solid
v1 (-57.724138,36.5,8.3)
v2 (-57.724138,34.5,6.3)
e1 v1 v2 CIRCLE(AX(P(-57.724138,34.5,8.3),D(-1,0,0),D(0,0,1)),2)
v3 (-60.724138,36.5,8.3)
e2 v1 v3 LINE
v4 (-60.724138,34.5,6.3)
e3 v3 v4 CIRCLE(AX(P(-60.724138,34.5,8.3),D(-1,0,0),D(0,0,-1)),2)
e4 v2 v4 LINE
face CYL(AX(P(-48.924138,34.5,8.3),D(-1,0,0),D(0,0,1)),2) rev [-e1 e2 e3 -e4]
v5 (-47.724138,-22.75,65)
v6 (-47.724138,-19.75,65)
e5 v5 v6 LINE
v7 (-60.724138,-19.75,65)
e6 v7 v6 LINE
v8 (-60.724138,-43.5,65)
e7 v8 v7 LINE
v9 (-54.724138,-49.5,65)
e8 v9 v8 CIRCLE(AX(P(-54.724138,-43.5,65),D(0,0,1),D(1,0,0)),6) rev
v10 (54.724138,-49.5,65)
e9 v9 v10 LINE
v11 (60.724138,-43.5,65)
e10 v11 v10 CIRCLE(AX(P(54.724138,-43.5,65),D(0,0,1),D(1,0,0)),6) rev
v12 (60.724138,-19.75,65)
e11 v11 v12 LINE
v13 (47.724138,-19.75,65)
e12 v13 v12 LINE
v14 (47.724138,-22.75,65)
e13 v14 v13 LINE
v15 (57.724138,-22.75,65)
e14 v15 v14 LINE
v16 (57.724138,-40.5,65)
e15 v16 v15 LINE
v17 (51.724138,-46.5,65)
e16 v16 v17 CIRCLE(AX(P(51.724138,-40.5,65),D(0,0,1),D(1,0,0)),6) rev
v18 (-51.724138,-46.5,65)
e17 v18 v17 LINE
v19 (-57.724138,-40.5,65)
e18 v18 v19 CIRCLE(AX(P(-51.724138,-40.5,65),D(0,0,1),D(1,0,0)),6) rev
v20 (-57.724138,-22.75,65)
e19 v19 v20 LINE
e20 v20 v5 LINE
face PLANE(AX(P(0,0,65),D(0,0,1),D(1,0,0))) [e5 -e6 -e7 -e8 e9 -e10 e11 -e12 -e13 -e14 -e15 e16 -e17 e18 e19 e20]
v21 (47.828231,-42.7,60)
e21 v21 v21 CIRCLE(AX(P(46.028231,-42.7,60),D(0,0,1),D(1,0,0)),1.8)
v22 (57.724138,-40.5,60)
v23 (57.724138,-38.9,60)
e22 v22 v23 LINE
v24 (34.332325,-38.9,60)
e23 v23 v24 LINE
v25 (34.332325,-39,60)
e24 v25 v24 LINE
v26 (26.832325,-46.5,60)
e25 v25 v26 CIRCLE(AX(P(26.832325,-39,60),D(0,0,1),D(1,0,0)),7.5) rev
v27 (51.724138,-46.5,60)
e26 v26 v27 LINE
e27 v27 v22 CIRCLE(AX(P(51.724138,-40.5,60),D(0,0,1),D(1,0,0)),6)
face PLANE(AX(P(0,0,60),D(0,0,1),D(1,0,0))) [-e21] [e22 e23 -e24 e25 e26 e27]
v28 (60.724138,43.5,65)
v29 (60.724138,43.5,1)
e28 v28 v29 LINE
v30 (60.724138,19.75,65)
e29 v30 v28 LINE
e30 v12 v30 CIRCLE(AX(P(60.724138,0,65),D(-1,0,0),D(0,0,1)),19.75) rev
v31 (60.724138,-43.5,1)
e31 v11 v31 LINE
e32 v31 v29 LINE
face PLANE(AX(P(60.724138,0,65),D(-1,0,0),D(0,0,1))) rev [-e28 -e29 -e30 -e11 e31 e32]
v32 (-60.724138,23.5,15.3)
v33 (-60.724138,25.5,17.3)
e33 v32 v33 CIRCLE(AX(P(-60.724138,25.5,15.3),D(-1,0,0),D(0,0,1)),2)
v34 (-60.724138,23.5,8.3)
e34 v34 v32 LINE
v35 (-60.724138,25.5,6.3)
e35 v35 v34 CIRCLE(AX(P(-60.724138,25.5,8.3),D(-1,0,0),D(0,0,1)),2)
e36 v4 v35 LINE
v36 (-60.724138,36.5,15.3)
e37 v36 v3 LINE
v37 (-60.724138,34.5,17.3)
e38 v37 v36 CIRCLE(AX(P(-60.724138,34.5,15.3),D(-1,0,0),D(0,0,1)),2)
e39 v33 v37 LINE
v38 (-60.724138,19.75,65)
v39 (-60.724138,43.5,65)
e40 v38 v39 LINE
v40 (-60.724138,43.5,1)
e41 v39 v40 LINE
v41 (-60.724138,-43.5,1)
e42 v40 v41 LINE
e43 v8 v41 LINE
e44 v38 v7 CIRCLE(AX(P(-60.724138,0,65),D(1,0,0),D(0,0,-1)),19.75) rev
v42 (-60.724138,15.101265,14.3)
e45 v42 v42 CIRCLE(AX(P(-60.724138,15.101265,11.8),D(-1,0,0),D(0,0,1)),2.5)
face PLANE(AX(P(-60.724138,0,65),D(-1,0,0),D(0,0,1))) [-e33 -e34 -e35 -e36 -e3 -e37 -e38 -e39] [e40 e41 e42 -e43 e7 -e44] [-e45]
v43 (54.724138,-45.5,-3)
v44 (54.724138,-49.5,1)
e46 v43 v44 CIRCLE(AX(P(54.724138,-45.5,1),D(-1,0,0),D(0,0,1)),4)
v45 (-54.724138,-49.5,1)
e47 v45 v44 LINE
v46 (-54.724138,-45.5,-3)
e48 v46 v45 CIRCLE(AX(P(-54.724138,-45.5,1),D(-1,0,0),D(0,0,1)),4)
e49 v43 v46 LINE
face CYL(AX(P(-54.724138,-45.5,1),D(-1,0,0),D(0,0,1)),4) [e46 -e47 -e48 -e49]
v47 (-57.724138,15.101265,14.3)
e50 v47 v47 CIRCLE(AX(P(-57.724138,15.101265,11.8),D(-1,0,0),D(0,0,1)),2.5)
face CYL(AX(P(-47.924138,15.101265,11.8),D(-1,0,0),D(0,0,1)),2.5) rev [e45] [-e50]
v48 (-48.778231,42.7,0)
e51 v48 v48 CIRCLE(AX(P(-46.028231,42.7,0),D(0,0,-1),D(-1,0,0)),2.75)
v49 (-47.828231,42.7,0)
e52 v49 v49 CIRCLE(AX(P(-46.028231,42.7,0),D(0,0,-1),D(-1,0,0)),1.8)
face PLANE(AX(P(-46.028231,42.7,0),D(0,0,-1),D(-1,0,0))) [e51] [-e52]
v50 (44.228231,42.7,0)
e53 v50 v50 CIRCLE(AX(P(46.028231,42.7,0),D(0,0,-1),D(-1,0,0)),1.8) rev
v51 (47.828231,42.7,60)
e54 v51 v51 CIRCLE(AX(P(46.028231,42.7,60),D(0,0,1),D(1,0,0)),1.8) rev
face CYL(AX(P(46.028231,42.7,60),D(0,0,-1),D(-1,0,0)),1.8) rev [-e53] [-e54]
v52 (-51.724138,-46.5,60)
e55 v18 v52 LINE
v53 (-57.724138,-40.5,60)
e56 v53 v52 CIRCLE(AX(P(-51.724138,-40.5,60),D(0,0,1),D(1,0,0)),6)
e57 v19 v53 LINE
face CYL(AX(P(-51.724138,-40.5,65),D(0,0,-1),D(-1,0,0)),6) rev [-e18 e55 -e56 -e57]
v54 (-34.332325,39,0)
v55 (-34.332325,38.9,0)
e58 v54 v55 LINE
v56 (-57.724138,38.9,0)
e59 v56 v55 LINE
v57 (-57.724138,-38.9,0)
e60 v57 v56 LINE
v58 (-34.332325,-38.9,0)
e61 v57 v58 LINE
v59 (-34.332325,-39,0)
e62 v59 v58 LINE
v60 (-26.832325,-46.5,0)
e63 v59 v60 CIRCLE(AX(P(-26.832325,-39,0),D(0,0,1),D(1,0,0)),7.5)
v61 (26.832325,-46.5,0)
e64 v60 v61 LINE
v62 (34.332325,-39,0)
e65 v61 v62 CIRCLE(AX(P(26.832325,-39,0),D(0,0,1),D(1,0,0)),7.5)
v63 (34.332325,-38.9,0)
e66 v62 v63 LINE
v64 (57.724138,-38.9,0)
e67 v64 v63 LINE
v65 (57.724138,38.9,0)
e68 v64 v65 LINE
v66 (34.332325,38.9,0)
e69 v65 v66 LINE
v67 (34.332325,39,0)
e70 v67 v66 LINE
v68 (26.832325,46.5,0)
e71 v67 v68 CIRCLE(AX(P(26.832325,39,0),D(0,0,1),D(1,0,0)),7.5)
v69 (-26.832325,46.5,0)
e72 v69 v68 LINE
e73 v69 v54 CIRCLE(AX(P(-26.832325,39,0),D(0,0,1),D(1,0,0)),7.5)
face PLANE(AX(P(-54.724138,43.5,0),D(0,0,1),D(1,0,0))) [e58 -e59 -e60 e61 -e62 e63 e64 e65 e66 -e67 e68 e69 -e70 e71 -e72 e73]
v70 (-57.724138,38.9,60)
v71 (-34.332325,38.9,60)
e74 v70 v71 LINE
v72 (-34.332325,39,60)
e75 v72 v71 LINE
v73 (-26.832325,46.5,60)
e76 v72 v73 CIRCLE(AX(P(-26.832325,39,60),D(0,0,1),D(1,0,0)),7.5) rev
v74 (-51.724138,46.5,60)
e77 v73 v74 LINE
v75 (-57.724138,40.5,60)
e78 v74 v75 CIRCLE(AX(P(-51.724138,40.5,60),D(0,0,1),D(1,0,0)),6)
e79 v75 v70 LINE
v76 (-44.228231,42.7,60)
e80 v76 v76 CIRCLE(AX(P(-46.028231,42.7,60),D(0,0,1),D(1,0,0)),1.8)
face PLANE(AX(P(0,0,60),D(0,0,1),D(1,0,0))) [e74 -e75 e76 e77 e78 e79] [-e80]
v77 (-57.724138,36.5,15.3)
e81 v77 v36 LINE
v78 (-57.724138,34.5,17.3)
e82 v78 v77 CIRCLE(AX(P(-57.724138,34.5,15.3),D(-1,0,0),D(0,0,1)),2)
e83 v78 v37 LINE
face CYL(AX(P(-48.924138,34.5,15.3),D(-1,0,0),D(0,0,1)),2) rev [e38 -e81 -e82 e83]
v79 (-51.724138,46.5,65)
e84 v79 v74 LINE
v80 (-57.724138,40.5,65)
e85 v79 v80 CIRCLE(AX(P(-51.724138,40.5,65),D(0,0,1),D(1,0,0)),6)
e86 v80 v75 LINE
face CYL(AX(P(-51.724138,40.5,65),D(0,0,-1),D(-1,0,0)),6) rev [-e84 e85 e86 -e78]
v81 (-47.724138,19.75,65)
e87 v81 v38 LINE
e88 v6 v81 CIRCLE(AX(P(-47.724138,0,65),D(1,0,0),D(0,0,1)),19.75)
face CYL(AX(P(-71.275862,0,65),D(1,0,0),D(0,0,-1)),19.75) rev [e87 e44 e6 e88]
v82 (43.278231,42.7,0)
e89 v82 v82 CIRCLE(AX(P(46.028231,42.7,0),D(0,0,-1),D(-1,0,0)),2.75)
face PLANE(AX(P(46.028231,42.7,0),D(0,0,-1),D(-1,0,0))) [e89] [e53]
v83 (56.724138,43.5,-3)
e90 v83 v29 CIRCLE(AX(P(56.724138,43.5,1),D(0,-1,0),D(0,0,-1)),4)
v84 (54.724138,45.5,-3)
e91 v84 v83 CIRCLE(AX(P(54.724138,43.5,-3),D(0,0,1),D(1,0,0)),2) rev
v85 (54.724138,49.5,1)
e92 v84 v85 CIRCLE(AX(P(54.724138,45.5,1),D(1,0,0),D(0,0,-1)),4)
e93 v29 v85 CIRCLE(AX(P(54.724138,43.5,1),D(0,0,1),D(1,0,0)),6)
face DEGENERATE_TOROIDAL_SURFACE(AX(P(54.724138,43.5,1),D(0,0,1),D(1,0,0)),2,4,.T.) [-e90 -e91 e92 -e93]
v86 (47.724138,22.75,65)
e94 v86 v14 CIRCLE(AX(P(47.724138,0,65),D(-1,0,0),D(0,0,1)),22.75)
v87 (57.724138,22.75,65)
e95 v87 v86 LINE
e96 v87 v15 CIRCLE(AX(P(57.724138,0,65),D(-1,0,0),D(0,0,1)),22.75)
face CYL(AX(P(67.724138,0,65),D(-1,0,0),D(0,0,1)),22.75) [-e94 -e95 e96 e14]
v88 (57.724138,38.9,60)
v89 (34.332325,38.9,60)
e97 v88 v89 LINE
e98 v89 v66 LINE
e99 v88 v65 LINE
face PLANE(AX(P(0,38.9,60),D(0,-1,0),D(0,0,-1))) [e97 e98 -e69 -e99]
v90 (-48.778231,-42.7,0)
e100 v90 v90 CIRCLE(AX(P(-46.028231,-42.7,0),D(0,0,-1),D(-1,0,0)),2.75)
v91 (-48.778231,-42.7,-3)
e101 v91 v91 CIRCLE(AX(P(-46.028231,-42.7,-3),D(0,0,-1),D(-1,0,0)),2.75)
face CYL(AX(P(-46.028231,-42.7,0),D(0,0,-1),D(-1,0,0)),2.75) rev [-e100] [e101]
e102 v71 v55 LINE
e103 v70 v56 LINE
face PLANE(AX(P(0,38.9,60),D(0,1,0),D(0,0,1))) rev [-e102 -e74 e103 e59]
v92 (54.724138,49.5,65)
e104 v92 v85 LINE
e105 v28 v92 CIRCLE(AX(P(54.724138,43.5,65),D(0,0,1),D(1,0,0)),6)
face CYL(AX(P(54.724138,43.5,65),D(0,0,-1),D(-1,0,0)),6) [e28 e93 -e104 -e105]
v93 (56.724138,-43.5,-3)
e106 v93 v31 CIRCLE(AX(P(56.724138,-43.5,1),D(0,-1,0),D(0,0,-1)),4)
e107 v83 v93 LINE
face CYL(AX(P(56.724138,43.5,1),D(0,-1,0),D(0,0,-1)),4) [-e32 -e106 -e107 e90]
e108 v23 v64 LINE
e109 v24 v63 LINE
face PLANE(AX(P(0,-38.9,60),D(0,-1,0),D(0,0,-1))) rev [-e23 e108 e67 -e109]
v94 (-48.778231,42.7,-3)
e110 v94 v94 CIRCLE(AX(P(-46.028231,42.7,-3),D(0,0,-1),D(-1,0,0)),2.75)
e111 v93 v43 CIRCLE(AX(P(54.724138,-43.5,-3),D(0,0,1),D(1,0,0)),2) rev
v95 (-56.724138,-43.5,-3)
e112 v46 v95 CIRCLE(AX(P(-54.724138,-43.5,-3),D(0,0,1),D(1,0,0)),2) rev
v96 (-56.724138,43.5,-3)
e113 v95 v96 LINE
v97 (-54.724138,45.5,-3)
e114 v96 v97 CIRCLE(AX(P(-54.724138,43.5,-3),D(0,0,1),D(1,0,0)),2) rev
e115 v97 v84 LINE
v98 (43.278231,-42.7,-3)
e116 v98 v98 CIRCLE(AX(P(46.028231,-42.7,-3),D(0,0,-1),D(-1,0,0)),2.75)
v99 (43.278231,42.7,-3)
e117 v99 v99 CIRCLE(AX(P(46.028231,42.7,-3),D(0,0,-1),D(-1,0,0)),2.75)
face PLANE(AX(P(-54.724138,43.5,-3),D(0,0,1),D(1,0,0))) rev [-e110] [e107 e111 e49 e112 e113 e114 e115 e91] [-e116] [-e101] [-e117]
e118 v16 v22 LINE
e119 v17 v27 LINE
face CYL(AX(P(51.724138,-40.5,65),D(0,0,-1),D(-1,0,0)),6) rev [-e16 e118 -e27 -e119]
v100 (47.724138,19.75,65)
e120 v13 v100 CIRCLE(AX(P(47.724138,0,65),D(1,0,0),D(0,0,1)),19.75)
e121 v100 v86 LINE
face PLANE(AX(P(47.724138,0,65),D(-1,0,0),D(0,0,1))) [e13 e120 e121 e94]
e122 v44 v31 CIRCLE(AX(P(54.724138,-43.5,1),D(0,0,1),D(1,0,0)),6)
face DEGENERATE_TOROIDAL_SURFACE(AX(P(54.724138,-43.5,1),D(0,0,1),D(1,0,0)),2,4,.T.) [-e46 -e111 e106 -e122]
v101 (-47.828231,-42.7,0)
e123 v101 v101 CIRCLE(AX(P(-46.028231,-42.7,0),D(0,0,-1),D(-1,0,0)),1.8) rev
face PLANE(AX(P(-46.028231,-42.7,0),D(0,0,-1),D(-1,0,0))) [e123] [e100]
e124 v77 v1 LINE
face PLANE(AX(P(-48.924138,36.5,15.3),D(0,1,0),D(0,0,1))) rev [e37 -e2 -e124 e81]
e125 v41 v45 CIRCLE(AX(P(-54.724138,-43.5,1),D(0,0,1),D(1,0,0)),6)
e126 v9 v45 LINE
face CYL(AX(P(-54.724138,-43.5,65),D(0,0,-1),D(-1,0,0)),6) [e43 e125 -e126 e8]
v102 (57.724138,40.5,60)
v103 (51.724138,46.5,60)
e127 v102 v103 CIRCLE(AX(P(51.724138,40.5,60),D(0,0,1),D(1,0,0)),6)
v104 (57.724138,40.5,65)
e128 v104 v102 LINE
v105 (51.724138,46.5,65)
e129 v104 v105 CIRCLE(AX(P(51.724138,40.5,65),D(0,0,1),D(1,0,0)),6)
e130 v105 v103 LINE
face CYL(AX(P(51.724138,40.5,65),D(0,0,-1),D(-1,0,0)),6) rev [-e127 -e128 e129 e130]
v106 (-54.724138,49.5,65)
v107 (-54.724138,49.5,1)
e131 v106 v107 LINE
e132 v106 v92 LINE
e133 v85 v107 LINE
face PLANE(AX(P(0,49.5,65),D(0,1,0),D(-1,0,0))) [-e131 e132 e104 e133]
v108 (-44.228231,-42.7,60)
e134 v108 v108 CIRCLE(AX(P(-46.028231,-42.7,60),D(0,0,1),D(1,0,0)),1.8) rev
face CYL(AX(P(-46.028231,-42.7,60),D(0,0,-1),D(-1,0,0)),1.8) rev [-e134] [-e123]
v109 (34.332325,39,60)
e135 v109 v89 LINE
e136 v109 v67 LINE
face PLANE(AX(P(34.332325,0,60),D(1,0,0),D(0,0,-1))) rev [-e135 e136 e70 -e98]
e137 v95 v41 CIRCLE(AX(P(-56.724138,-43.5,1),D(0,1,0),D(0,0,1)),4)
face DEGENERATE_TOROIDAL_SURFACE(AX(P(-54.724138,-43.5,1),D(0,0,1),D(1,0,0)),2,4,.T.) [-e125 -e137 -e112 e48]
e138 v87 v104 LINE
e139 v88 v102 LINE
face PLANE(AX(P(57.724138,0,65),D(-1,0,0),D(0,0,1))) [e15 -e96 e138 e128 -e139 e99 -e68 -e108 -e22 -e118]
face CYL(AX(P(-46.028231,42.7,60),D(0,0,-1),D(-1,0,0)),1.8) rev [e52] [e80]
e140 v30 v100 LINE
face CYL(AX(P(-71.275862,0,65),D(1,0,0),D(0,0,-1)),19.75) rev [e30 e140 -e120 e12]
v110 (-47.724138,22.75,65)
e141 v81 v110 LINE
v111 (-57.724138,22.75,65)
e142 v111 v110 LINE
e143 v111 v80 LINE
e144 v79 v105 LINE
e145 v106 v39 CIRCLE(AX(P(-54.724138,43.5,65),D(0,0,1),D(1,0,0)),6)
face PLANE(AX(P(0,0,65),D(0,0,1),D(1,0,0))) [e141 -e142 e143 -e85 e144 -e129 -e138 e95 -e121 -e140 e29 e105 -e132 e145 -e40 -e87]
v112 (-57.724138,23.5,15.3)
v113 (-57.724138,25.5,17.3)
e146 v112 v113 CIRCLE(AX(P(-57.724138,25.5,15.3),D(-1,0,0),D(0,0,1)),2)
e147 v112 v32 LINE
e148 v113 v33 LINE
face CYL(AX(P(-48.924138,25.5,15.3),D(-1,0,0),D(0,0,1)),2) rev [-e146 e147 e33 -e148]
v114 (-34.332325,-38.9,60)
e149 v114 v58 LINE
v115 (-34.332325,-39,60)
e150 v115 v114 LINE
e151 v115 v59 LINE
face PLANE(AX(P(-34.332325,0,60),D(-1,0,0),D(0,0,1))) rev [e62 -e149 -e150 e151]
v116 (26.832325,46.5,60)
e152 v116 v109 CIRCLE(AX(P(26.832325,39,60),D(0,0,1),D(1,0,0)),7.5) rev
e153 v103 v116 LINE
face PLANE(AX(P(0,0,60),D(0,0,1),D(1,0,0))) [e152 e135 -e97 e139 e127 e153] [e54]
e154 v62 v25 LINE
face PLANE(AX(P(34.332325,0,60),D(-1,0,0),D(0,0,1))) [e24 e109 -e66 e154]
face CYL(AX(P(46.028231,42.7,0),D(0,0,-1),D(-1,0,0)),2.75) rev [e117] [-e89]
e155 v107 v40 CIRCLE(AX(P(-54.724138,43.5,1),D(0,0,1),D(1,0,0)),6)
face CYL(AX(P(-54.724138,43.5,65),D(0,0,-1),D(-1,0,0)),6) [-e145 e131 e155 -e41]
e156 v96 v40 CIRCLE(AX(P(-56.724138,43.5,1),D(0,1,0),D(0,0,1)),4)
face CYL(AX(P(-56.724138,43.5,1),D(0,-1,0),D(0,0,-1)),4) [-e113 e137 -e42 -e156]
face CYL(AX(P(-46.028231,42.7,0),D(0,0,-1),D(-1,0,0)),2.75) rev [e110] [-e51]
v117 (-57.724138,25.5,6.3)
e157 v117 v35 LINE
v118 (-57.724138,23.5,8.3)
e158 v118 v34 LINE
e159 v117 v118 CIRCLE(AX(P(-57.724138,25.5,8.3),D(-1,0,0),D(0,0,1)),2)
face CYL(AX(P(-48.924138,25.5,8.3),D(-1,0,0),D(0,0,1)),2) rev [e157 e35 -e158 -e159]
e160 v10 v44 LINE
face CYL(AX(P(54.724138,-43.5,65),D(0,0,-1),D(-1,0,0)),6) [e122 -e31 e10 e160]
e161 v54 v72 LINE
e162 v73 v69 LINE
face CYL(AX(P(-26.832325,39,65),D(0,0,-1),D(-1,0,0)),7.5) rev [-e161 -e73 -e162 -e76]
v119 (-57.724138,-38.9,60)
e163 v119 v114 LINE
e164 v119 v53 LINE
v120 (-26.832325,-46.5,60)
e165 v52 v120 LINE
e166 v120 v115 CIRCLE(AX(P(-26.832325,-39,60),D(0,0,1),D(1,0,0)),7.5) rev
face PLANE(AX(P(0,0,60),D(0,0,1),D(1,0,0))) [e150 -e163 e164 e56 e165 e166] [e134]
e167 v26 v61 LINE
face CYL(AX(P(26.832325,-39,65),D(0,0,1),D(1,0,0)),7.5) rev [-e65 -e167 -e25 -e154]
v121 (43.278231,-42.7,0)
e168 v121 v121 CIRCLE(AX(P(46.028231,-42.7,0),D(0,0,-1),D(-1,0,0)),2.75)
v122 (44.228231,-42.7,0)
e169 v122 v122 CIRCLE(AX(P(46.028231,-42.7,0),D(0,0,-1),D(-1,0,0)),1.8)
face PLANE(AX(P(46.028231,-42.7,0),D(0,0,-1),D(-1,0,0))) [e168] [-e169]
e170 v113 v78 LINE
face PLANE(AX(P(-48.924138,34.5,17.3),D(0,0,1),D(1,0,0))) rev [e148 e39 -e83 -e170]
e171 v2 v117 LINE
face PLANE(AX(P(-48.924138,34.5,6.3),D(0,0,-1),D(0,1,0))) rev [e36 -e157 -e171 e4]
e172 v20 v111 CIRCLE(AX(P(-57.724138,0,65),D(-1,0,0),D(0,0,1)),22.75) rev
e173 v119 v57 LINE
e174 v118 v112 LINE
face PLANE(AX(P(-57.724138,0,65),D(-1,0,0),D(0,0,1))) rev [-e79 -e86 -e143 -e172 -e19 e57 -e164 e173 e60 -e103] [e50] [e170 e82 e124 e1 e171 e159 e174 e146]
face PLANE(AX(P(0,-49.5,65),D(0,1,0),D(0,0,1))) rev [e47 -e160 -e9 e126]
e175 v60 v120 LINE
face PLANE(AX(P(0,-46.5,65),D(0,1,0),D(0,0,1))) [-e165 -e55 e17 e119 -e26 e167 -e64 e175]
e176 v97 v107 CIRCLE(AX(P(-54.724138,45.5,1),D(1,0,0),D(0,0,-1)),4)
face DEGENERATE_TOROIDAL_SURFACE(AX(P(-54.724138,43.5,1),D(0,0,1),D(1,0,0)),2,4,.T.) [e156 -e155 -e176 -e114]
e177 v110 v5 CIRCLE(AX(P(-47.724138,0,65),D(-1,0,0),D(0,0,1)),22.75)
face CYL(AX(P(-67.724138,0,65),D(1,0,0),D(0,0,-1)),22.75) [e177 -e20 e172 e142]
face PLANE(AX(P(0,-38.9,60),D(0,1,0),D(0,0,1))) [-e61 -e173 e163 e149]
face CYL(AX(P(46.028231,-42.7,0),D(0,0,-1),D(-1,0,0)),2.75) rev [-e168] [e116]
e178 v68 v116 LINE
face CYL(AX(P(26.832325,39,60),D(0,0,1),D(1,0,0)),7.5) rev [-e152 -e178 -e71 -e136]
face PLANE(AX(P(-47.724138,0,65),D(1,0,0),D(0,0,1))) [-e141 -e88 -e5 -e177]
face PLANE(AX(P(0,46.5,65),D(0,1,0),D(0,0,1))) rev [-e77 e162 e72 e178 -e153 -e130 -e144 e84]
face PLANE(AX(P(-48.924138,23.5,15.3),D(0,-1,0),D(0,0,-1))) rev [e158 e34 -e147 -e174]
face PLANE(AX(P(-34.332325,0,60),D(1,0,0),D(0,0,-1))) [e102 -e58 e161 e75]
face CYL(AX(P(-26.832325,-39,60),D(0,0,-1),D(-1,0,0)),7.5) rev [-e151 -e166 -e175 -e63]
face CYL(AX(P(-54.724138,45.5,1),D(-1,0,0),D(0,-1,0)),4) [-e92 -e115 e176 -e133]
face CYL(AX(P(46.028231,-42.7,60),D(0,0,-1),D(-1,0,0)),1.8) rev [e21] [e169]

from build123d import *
from build123d.topology import SkipClean

# Parameters (mm, degrees)
BOSS_EXTRUDE1_DEPTH = 65
BOSS_EXTRUDE3_START = 3
BOSS_EXTRUDE3_DEPTH = 3
SKETCH4_R           = 19.75
CUT_EXTRUDE1_DEPTH  = 132
SKETCH8_R           = 1.8
BOSS_EXTRUDE6_DEPTH = 60
FILLET1_R           = 7.5
FILLET2_R           = 7.5
FILLET3_R           = 7.5
FILLET4_R           = 7.5
BOSS_EXTRUDE8_DEPTH = 10
FILLET8_R           = 4
CUT_EXTRUDE2_START  = -40
SKETCH13_R          = 1.8
CUT_EXTRUDE2_DEPTH  = 40
SKETCH14_R          = 2.75
CUT_EXTRUDE3_DEPTH  = 3
CUT_EXTRUDE4_DEPTH  = 11.8
SKETCH16_R          = 2.5
CUT_EXTRUDE5_DEPTH  = 12.8
SKETCH18_W          = 9.402156545
SKETCH18_H          = 47.685659657
SKETCH18_W_2        = 10.670772927
CUT_EXTRUDE6_DEPTH  = 23.8


with BuildPart() as part:
    # Sketch1 → Boss-Extrude1 (new body)
    with BuildSketch(Plane(origin=(0, 0, 0), x_dir=(0, 1, 0), z_dir=(0, 0, 1))):
        with BuildLine():
            ThreePointArc((-43.5, 60.724137931), (-47.742640687, 58.966778618), (-49.5, 54.724137931))
            Line((-49.5, 54.724137931), (-49.5, -54.724137931))
            ThreePointArc((-49.5, -54.724137931), (-47.742640687, -58.966778618), (-43.5, -60.724137931))
            Line((-43.5, -60.724137931), (43.5, -60.724137931))
            ThreePointArc((43.5, -60.724137931), (47.742640687, -58.966778618), (49.5, -54.724137931))
            Line((49.5, -54.724137931), (49.5, 54.724137931))
            ThreePointArc((49.5, 54.724137931), (47.742640687, 58.966778618), (43.5, 60.724137931))
            Line((43.5, 60.724137931), (-43.5, 60.724137931))
        make_face()
        with BuildLine():
            ThreePointArc((-46.5, 51.724137931), (-44.742640687, 55.966778618), (-40.5, 57.724137931))
            Line((-40.5, 57.724137931), (40.5, 57.724137931))
            ThreePointArc((40.5, 57.724137931), (44.742640687, 55.966778618), (46.5, 51.724137931))
            Line((46.5, 51.724137931), (46.5, -51.724137931))
            ThreePointArc((46.5, -51.724137931), (44.742640687, -55.966778618), (40.5, -57.724137931))
            Line((40.5, -57.724137931), (-40.5, -57.724137931))
            ThreePointArc((-40.5, -57.724137931), (-44.742640687, -55.966778618), (-46.5, -51.724137931))
            Line((-46.5, -51.724137931), (-46.5, 51.724137931))
        make_face(mode=Mode.SUBTRACT)
    extrude(amount=BOSS_EXTRUDE1_DEPTH)

    # Sketch3 → Boss-Extrude3 (add)
    with BuildSketch(Plane(origin=(0, 0, 0), x_dir=(1, 0, 0), z_dir=(0, 0, -1)).offset(BOSS_EXTRUDE3_START)):
        with BuildLine():
            Line((-54.724137931, 49.5), (54.724137931, 49.5))
            ThreePointArc((54.724137931, 49.5), (58.966778618, 47.742640687), (60.724137931, 43.5))
            Line((60.724137931, 43.5), (60.724137931, -43.5))
            ThreePointArc((60.724137931, -43.5), (58.966778618, -47.742640687), (54.724137931, -49.5))
            Line((54.724137931, -49.5), (-54.724137931, -49.5))
            ThreePointArc((-54.724137931, -49.5), (-58.966778618, -47.742640687), (-60.724137931, -43.5))
            Line((-60.724137931, -43.5), (-60.724137931, 43.5))
            ThreePointArc((-60.724137931, 43.5), (-58.966778618, 47.742640687), (-54.724137931, 49.5))
        make_face()
    extrude(amount=-BOSS_EXTRUDE3_DEPTH)

    # Sketch4 → Cut-Extrude1 (cut)
    with BuildSketch(Plane.YZ.offset(60.724137931)):
        with Locations((0, 65)):
            Circle(SKETCH4_R)
    extrude(amount=-CUT_EXTRUDE1_DEPTH, mode=Mode.SUBTRACT)

    # Sketch8 → Boss-Extrude6 (add)
    # profile 1 of 4: a face of its own
    with BuildSketch(Plane.XY):
        with BuildLine():
            Line((-34.332324886, 46.5), (-51.724137931, 46.5))
            ThreePointArc((-51.724137931, 46.5), (-55.966778618, 44.742640687), (-57.724137931, 40.5))
            Line((-57.724137931, 40.5), (-57.724137931, 38.9))
            Line((-57.724137931, 38.9), (-34.332324886, 38.9))
            Line((-34.332324886, 38.9), (-34.332324886, 46.5))
        make_face()
        with Locations((-46.028231409, 42.7)):
            Circle(SKETCH8_R, mode=Mode.SUBTRACT)
    # profile 2 of 4: a face of its own
    with BuildSketch(Plane.XY):
        with BuildLine():
            Line((51.724137931, 46.5), (34.332324886, 46.5))
            Line((34.332324886, 46.5), (34.332324886, 38.9))
            Line((34.332324886, 38.9), (57.724137931, 38.9))
            Line((57.724137931, 38.9), (57.724137931, 40.5))
            ThreePointArc((57.724137931, 40.5), (55.966778618, 44.742640687), (51.724137931, 46.5))
        make_face()
        with Locations((46.028231409, 42.7)):
            Circle(SKETCH8_R, mode=Mode.SUBTRACT)
    # profile 3 of 4: a face of its own
    with BuildSketch(Plane.XY):
        with BuildLine():
            Line((-34.332324886, -38.9), (-57.724137931, -38.9))
            Line((-57.724137931, -38.9), (-57.724137931, -40.5))
            ThreePointArc((-57.724137931, -40.5), (-55.966778618, -44.742640687), (-51.724137931, -46.5))
            Line((-51.724137931, -46.5), (-34.332324886, -46.5))
            Line((-34.332324886, -46.5), (-34.332324886, -38.9))
        make_face()
        with Locations((-46.028231409, -42.7)):
            Circle(SKETCH8_R, mode=Mode.SUBTRACT)
    # profile 4 of 4: a face of its own
    with BuildSketch(Plane.XY):
        with BuildLine():
            Line((57.724137931, -40.5), (57.724137931, -38.9))
            Line((57.724137931, -38.9), (34.332324886, -38.9))
            Line((34.332324886, -38.9), (34.332324886, -46.5))
            Line((34.332324886, -46.5), (51.724137931, -46.5))
            ThreePointArc((51.724137931, -46.5), (55.966778618, -44.742640687), (57.724137931, -40.5))
        make_face()
        with Locations((46.028231409, -42.7)):
            Circle(SKETCH8_R, mode=Mode.SUBTRACT)
    extrude(amount=BOSS_EXTRUDE6_DEPTH)

    # Fillet1
    fillet1_edges = [part.edges().sort_by_distance(p)[0] for p in [
        (-34.332324886, 46.5, 30),
    ]]
    fillet(fillet1_edges, radius=FILLET1_R)

    # Fillet2
    fillet2_edges = [part.edges().sort_by_distance(p)[0] for p in [
        (34.332324886, 46.5, 30),
    ]]
    fillet(fillet2_edges, radius=FILLET2_R)

    # Fillet3
    fillet3_edges = [part.edges().sort_by_distance(p)[0] for p in [
        (-34.332324886, -46.5, 30),
    ]]
    fillet(fillet3_edges, radius=FILLET3_R)

    # Fillet4
    fillet4_edges = [part.edges().sort_by_distance(p)[0] for p in [
        (34.332324886, -46.5, 30),
    ]]
    fillet(fillet4_edges, radius=FILLET4_R)

    # Sketch12 → Boss-Extrude8 (add, symmetric)
    with SkipClean():  # the faces are left unmerged after this step: merging them gives an invalid solid
        with BuildSketch(Plane(origin=(57.724137931, 0, 0), x_dir=(0, -1, 0), z_dir=(-1, 0, 0))):
            with BuildLine():
                Line((-19.75, 65), (-22.75, 65))
                ThreePointArc((-22.75, 65), (0, 42.25), (22.75, 65))
                Line((22.75, 65), (19.75, 65))
                ThreePointArc((19.75, 65), (0, 45.25), (-19.75, 65))
            make_face()
        boss_extrude8 = extrude(amount=BOSS_EXTRUDE8_DEPTH, both=True)
    add(part.part.scale(1), mode=Mode.REPLACE)  # the faces are merged on a copy

    # Mirror2: Boss-Extrude8 across plane
    add(boss_extrude8.mirror(Plane(origin=(0, 0, 0), x_dir=(0, 0, 1), z_dir=(1, 0, 0))))

    # Fillet8
    fillet8_edges = [part.edges().sort_by_distance(p)[0] for p in [
        (-60.724137931, 0, -3),
    ]]
    fillet(fillet8_edges, radius=FILLET8_R)

    # Sketch13 → Cut-Extrude2 (cut)
    with BuildSketch(Plane.XY.offset(CUT_EXTRUDE2_START)):
        with Locations((-46.028231409, 42.7)):
            Circle(SKETCH13_R)
        with Locations((46.028231409, 42.7)):
            Circle(SKETCH13_R)
        with Locations((-46.028231409, -42.7)):
            Circle(SKETCH13_R)
        with Locations((46.028231409, -42.7)):
            Circle(SKETCH13_R)
    extrude(amount=CUT_EXTRUDE2_DEPTH, mode=Mode.SUBTRACT)

    # Sketch14 → Cut-Extrude3 (cut)
    with BuildSketch(Plane(origin=(0, 0, -3), x_dir=(1, 0, 0), z_dir=(0, 0, -1))):
        with Locations((-46.028231409, 42.7)):
            Circle(SKETCH14_R)
        with Locations((-46.028231409, -42.7)):
            Circle(SKETCH14_R)
        with Locations((46.028231409, -42.7)):
            Circle(SKETCH14_R)
        with Locations((46.028231409, 42.7)):
            Circle(SKETCH14_R)
    extrude(amount=-CUT_EXTRUDE3_DEPTH, mode=Mode.SUBTRACT)

    # Sketch15 → Cut-Extrude4 (cut)
    with BuildSketch(Plane(origin=(-60.724137931, 0, 0), x_dir=(0, -1, 0), z_dir=(-1, 0, 0))):
        with BuildLine():
            Line((-34.5, 17.3), (-25.5, 17.3))
            ThreePointArc((-25.5, 17.3), (-24.085786438, 16.714213562), (-23.5, 15.3))
            Line((-23.5, 15.3), (-23.5, 8.3))
            ThreePointArc((-23.5, 8.3), (-24.085786438, 6.885786438), (-25.5, 6.3))
            Line((-25.5, 6.3), (-34.5, 6.3))
            ThreePointArc((-34.5, 6.3), (-35.914213562, 6.885786438), (-36.5, 8.3))
            Line((-36.5, 8.3), (-36.5, 15.3))
            ThreePointArc((-36.5, 15.3), (-35.914213562, 16.714213562), (-34.5, 17.3))
        make_face()
    extrude(amount=-CUT_EXTRUDE4_DEPTH, mode=Mode.SUBTRACT)

    # Sketch16 → Cut-Extrude5 (cut)
    with BuildSketch(Plane(origin=(-60.724137931, 0, 0), x_dir=(0, -1, 0), z_dir=(-1, 0, 0))):
        with Locations((-15.101265496, 11.8)):
            Circle(SKETCH16_R)
    extrude(amount=-CUT_EXTRUDE5_DEPTH, mode=Mode.SUBTRACT)

    # Sketch18 → Cut-Extrude6 (cut)
    with BuildSketch(Plane.XY.offset(65)):
        with Locations((-65.425216203, -1.092829829)):
            Rectangle(SKETCH18_W, SKETCH18_H)
        with Locations((66.059524395, -1.092829829)):
            Rectangle(SKETCH18_W_2, SKETCH18_H)
    extrude(amount=-CUT_EXTRUDE6_DEPTH, mode=Mode.SUBTRACT)


solid = part.part
